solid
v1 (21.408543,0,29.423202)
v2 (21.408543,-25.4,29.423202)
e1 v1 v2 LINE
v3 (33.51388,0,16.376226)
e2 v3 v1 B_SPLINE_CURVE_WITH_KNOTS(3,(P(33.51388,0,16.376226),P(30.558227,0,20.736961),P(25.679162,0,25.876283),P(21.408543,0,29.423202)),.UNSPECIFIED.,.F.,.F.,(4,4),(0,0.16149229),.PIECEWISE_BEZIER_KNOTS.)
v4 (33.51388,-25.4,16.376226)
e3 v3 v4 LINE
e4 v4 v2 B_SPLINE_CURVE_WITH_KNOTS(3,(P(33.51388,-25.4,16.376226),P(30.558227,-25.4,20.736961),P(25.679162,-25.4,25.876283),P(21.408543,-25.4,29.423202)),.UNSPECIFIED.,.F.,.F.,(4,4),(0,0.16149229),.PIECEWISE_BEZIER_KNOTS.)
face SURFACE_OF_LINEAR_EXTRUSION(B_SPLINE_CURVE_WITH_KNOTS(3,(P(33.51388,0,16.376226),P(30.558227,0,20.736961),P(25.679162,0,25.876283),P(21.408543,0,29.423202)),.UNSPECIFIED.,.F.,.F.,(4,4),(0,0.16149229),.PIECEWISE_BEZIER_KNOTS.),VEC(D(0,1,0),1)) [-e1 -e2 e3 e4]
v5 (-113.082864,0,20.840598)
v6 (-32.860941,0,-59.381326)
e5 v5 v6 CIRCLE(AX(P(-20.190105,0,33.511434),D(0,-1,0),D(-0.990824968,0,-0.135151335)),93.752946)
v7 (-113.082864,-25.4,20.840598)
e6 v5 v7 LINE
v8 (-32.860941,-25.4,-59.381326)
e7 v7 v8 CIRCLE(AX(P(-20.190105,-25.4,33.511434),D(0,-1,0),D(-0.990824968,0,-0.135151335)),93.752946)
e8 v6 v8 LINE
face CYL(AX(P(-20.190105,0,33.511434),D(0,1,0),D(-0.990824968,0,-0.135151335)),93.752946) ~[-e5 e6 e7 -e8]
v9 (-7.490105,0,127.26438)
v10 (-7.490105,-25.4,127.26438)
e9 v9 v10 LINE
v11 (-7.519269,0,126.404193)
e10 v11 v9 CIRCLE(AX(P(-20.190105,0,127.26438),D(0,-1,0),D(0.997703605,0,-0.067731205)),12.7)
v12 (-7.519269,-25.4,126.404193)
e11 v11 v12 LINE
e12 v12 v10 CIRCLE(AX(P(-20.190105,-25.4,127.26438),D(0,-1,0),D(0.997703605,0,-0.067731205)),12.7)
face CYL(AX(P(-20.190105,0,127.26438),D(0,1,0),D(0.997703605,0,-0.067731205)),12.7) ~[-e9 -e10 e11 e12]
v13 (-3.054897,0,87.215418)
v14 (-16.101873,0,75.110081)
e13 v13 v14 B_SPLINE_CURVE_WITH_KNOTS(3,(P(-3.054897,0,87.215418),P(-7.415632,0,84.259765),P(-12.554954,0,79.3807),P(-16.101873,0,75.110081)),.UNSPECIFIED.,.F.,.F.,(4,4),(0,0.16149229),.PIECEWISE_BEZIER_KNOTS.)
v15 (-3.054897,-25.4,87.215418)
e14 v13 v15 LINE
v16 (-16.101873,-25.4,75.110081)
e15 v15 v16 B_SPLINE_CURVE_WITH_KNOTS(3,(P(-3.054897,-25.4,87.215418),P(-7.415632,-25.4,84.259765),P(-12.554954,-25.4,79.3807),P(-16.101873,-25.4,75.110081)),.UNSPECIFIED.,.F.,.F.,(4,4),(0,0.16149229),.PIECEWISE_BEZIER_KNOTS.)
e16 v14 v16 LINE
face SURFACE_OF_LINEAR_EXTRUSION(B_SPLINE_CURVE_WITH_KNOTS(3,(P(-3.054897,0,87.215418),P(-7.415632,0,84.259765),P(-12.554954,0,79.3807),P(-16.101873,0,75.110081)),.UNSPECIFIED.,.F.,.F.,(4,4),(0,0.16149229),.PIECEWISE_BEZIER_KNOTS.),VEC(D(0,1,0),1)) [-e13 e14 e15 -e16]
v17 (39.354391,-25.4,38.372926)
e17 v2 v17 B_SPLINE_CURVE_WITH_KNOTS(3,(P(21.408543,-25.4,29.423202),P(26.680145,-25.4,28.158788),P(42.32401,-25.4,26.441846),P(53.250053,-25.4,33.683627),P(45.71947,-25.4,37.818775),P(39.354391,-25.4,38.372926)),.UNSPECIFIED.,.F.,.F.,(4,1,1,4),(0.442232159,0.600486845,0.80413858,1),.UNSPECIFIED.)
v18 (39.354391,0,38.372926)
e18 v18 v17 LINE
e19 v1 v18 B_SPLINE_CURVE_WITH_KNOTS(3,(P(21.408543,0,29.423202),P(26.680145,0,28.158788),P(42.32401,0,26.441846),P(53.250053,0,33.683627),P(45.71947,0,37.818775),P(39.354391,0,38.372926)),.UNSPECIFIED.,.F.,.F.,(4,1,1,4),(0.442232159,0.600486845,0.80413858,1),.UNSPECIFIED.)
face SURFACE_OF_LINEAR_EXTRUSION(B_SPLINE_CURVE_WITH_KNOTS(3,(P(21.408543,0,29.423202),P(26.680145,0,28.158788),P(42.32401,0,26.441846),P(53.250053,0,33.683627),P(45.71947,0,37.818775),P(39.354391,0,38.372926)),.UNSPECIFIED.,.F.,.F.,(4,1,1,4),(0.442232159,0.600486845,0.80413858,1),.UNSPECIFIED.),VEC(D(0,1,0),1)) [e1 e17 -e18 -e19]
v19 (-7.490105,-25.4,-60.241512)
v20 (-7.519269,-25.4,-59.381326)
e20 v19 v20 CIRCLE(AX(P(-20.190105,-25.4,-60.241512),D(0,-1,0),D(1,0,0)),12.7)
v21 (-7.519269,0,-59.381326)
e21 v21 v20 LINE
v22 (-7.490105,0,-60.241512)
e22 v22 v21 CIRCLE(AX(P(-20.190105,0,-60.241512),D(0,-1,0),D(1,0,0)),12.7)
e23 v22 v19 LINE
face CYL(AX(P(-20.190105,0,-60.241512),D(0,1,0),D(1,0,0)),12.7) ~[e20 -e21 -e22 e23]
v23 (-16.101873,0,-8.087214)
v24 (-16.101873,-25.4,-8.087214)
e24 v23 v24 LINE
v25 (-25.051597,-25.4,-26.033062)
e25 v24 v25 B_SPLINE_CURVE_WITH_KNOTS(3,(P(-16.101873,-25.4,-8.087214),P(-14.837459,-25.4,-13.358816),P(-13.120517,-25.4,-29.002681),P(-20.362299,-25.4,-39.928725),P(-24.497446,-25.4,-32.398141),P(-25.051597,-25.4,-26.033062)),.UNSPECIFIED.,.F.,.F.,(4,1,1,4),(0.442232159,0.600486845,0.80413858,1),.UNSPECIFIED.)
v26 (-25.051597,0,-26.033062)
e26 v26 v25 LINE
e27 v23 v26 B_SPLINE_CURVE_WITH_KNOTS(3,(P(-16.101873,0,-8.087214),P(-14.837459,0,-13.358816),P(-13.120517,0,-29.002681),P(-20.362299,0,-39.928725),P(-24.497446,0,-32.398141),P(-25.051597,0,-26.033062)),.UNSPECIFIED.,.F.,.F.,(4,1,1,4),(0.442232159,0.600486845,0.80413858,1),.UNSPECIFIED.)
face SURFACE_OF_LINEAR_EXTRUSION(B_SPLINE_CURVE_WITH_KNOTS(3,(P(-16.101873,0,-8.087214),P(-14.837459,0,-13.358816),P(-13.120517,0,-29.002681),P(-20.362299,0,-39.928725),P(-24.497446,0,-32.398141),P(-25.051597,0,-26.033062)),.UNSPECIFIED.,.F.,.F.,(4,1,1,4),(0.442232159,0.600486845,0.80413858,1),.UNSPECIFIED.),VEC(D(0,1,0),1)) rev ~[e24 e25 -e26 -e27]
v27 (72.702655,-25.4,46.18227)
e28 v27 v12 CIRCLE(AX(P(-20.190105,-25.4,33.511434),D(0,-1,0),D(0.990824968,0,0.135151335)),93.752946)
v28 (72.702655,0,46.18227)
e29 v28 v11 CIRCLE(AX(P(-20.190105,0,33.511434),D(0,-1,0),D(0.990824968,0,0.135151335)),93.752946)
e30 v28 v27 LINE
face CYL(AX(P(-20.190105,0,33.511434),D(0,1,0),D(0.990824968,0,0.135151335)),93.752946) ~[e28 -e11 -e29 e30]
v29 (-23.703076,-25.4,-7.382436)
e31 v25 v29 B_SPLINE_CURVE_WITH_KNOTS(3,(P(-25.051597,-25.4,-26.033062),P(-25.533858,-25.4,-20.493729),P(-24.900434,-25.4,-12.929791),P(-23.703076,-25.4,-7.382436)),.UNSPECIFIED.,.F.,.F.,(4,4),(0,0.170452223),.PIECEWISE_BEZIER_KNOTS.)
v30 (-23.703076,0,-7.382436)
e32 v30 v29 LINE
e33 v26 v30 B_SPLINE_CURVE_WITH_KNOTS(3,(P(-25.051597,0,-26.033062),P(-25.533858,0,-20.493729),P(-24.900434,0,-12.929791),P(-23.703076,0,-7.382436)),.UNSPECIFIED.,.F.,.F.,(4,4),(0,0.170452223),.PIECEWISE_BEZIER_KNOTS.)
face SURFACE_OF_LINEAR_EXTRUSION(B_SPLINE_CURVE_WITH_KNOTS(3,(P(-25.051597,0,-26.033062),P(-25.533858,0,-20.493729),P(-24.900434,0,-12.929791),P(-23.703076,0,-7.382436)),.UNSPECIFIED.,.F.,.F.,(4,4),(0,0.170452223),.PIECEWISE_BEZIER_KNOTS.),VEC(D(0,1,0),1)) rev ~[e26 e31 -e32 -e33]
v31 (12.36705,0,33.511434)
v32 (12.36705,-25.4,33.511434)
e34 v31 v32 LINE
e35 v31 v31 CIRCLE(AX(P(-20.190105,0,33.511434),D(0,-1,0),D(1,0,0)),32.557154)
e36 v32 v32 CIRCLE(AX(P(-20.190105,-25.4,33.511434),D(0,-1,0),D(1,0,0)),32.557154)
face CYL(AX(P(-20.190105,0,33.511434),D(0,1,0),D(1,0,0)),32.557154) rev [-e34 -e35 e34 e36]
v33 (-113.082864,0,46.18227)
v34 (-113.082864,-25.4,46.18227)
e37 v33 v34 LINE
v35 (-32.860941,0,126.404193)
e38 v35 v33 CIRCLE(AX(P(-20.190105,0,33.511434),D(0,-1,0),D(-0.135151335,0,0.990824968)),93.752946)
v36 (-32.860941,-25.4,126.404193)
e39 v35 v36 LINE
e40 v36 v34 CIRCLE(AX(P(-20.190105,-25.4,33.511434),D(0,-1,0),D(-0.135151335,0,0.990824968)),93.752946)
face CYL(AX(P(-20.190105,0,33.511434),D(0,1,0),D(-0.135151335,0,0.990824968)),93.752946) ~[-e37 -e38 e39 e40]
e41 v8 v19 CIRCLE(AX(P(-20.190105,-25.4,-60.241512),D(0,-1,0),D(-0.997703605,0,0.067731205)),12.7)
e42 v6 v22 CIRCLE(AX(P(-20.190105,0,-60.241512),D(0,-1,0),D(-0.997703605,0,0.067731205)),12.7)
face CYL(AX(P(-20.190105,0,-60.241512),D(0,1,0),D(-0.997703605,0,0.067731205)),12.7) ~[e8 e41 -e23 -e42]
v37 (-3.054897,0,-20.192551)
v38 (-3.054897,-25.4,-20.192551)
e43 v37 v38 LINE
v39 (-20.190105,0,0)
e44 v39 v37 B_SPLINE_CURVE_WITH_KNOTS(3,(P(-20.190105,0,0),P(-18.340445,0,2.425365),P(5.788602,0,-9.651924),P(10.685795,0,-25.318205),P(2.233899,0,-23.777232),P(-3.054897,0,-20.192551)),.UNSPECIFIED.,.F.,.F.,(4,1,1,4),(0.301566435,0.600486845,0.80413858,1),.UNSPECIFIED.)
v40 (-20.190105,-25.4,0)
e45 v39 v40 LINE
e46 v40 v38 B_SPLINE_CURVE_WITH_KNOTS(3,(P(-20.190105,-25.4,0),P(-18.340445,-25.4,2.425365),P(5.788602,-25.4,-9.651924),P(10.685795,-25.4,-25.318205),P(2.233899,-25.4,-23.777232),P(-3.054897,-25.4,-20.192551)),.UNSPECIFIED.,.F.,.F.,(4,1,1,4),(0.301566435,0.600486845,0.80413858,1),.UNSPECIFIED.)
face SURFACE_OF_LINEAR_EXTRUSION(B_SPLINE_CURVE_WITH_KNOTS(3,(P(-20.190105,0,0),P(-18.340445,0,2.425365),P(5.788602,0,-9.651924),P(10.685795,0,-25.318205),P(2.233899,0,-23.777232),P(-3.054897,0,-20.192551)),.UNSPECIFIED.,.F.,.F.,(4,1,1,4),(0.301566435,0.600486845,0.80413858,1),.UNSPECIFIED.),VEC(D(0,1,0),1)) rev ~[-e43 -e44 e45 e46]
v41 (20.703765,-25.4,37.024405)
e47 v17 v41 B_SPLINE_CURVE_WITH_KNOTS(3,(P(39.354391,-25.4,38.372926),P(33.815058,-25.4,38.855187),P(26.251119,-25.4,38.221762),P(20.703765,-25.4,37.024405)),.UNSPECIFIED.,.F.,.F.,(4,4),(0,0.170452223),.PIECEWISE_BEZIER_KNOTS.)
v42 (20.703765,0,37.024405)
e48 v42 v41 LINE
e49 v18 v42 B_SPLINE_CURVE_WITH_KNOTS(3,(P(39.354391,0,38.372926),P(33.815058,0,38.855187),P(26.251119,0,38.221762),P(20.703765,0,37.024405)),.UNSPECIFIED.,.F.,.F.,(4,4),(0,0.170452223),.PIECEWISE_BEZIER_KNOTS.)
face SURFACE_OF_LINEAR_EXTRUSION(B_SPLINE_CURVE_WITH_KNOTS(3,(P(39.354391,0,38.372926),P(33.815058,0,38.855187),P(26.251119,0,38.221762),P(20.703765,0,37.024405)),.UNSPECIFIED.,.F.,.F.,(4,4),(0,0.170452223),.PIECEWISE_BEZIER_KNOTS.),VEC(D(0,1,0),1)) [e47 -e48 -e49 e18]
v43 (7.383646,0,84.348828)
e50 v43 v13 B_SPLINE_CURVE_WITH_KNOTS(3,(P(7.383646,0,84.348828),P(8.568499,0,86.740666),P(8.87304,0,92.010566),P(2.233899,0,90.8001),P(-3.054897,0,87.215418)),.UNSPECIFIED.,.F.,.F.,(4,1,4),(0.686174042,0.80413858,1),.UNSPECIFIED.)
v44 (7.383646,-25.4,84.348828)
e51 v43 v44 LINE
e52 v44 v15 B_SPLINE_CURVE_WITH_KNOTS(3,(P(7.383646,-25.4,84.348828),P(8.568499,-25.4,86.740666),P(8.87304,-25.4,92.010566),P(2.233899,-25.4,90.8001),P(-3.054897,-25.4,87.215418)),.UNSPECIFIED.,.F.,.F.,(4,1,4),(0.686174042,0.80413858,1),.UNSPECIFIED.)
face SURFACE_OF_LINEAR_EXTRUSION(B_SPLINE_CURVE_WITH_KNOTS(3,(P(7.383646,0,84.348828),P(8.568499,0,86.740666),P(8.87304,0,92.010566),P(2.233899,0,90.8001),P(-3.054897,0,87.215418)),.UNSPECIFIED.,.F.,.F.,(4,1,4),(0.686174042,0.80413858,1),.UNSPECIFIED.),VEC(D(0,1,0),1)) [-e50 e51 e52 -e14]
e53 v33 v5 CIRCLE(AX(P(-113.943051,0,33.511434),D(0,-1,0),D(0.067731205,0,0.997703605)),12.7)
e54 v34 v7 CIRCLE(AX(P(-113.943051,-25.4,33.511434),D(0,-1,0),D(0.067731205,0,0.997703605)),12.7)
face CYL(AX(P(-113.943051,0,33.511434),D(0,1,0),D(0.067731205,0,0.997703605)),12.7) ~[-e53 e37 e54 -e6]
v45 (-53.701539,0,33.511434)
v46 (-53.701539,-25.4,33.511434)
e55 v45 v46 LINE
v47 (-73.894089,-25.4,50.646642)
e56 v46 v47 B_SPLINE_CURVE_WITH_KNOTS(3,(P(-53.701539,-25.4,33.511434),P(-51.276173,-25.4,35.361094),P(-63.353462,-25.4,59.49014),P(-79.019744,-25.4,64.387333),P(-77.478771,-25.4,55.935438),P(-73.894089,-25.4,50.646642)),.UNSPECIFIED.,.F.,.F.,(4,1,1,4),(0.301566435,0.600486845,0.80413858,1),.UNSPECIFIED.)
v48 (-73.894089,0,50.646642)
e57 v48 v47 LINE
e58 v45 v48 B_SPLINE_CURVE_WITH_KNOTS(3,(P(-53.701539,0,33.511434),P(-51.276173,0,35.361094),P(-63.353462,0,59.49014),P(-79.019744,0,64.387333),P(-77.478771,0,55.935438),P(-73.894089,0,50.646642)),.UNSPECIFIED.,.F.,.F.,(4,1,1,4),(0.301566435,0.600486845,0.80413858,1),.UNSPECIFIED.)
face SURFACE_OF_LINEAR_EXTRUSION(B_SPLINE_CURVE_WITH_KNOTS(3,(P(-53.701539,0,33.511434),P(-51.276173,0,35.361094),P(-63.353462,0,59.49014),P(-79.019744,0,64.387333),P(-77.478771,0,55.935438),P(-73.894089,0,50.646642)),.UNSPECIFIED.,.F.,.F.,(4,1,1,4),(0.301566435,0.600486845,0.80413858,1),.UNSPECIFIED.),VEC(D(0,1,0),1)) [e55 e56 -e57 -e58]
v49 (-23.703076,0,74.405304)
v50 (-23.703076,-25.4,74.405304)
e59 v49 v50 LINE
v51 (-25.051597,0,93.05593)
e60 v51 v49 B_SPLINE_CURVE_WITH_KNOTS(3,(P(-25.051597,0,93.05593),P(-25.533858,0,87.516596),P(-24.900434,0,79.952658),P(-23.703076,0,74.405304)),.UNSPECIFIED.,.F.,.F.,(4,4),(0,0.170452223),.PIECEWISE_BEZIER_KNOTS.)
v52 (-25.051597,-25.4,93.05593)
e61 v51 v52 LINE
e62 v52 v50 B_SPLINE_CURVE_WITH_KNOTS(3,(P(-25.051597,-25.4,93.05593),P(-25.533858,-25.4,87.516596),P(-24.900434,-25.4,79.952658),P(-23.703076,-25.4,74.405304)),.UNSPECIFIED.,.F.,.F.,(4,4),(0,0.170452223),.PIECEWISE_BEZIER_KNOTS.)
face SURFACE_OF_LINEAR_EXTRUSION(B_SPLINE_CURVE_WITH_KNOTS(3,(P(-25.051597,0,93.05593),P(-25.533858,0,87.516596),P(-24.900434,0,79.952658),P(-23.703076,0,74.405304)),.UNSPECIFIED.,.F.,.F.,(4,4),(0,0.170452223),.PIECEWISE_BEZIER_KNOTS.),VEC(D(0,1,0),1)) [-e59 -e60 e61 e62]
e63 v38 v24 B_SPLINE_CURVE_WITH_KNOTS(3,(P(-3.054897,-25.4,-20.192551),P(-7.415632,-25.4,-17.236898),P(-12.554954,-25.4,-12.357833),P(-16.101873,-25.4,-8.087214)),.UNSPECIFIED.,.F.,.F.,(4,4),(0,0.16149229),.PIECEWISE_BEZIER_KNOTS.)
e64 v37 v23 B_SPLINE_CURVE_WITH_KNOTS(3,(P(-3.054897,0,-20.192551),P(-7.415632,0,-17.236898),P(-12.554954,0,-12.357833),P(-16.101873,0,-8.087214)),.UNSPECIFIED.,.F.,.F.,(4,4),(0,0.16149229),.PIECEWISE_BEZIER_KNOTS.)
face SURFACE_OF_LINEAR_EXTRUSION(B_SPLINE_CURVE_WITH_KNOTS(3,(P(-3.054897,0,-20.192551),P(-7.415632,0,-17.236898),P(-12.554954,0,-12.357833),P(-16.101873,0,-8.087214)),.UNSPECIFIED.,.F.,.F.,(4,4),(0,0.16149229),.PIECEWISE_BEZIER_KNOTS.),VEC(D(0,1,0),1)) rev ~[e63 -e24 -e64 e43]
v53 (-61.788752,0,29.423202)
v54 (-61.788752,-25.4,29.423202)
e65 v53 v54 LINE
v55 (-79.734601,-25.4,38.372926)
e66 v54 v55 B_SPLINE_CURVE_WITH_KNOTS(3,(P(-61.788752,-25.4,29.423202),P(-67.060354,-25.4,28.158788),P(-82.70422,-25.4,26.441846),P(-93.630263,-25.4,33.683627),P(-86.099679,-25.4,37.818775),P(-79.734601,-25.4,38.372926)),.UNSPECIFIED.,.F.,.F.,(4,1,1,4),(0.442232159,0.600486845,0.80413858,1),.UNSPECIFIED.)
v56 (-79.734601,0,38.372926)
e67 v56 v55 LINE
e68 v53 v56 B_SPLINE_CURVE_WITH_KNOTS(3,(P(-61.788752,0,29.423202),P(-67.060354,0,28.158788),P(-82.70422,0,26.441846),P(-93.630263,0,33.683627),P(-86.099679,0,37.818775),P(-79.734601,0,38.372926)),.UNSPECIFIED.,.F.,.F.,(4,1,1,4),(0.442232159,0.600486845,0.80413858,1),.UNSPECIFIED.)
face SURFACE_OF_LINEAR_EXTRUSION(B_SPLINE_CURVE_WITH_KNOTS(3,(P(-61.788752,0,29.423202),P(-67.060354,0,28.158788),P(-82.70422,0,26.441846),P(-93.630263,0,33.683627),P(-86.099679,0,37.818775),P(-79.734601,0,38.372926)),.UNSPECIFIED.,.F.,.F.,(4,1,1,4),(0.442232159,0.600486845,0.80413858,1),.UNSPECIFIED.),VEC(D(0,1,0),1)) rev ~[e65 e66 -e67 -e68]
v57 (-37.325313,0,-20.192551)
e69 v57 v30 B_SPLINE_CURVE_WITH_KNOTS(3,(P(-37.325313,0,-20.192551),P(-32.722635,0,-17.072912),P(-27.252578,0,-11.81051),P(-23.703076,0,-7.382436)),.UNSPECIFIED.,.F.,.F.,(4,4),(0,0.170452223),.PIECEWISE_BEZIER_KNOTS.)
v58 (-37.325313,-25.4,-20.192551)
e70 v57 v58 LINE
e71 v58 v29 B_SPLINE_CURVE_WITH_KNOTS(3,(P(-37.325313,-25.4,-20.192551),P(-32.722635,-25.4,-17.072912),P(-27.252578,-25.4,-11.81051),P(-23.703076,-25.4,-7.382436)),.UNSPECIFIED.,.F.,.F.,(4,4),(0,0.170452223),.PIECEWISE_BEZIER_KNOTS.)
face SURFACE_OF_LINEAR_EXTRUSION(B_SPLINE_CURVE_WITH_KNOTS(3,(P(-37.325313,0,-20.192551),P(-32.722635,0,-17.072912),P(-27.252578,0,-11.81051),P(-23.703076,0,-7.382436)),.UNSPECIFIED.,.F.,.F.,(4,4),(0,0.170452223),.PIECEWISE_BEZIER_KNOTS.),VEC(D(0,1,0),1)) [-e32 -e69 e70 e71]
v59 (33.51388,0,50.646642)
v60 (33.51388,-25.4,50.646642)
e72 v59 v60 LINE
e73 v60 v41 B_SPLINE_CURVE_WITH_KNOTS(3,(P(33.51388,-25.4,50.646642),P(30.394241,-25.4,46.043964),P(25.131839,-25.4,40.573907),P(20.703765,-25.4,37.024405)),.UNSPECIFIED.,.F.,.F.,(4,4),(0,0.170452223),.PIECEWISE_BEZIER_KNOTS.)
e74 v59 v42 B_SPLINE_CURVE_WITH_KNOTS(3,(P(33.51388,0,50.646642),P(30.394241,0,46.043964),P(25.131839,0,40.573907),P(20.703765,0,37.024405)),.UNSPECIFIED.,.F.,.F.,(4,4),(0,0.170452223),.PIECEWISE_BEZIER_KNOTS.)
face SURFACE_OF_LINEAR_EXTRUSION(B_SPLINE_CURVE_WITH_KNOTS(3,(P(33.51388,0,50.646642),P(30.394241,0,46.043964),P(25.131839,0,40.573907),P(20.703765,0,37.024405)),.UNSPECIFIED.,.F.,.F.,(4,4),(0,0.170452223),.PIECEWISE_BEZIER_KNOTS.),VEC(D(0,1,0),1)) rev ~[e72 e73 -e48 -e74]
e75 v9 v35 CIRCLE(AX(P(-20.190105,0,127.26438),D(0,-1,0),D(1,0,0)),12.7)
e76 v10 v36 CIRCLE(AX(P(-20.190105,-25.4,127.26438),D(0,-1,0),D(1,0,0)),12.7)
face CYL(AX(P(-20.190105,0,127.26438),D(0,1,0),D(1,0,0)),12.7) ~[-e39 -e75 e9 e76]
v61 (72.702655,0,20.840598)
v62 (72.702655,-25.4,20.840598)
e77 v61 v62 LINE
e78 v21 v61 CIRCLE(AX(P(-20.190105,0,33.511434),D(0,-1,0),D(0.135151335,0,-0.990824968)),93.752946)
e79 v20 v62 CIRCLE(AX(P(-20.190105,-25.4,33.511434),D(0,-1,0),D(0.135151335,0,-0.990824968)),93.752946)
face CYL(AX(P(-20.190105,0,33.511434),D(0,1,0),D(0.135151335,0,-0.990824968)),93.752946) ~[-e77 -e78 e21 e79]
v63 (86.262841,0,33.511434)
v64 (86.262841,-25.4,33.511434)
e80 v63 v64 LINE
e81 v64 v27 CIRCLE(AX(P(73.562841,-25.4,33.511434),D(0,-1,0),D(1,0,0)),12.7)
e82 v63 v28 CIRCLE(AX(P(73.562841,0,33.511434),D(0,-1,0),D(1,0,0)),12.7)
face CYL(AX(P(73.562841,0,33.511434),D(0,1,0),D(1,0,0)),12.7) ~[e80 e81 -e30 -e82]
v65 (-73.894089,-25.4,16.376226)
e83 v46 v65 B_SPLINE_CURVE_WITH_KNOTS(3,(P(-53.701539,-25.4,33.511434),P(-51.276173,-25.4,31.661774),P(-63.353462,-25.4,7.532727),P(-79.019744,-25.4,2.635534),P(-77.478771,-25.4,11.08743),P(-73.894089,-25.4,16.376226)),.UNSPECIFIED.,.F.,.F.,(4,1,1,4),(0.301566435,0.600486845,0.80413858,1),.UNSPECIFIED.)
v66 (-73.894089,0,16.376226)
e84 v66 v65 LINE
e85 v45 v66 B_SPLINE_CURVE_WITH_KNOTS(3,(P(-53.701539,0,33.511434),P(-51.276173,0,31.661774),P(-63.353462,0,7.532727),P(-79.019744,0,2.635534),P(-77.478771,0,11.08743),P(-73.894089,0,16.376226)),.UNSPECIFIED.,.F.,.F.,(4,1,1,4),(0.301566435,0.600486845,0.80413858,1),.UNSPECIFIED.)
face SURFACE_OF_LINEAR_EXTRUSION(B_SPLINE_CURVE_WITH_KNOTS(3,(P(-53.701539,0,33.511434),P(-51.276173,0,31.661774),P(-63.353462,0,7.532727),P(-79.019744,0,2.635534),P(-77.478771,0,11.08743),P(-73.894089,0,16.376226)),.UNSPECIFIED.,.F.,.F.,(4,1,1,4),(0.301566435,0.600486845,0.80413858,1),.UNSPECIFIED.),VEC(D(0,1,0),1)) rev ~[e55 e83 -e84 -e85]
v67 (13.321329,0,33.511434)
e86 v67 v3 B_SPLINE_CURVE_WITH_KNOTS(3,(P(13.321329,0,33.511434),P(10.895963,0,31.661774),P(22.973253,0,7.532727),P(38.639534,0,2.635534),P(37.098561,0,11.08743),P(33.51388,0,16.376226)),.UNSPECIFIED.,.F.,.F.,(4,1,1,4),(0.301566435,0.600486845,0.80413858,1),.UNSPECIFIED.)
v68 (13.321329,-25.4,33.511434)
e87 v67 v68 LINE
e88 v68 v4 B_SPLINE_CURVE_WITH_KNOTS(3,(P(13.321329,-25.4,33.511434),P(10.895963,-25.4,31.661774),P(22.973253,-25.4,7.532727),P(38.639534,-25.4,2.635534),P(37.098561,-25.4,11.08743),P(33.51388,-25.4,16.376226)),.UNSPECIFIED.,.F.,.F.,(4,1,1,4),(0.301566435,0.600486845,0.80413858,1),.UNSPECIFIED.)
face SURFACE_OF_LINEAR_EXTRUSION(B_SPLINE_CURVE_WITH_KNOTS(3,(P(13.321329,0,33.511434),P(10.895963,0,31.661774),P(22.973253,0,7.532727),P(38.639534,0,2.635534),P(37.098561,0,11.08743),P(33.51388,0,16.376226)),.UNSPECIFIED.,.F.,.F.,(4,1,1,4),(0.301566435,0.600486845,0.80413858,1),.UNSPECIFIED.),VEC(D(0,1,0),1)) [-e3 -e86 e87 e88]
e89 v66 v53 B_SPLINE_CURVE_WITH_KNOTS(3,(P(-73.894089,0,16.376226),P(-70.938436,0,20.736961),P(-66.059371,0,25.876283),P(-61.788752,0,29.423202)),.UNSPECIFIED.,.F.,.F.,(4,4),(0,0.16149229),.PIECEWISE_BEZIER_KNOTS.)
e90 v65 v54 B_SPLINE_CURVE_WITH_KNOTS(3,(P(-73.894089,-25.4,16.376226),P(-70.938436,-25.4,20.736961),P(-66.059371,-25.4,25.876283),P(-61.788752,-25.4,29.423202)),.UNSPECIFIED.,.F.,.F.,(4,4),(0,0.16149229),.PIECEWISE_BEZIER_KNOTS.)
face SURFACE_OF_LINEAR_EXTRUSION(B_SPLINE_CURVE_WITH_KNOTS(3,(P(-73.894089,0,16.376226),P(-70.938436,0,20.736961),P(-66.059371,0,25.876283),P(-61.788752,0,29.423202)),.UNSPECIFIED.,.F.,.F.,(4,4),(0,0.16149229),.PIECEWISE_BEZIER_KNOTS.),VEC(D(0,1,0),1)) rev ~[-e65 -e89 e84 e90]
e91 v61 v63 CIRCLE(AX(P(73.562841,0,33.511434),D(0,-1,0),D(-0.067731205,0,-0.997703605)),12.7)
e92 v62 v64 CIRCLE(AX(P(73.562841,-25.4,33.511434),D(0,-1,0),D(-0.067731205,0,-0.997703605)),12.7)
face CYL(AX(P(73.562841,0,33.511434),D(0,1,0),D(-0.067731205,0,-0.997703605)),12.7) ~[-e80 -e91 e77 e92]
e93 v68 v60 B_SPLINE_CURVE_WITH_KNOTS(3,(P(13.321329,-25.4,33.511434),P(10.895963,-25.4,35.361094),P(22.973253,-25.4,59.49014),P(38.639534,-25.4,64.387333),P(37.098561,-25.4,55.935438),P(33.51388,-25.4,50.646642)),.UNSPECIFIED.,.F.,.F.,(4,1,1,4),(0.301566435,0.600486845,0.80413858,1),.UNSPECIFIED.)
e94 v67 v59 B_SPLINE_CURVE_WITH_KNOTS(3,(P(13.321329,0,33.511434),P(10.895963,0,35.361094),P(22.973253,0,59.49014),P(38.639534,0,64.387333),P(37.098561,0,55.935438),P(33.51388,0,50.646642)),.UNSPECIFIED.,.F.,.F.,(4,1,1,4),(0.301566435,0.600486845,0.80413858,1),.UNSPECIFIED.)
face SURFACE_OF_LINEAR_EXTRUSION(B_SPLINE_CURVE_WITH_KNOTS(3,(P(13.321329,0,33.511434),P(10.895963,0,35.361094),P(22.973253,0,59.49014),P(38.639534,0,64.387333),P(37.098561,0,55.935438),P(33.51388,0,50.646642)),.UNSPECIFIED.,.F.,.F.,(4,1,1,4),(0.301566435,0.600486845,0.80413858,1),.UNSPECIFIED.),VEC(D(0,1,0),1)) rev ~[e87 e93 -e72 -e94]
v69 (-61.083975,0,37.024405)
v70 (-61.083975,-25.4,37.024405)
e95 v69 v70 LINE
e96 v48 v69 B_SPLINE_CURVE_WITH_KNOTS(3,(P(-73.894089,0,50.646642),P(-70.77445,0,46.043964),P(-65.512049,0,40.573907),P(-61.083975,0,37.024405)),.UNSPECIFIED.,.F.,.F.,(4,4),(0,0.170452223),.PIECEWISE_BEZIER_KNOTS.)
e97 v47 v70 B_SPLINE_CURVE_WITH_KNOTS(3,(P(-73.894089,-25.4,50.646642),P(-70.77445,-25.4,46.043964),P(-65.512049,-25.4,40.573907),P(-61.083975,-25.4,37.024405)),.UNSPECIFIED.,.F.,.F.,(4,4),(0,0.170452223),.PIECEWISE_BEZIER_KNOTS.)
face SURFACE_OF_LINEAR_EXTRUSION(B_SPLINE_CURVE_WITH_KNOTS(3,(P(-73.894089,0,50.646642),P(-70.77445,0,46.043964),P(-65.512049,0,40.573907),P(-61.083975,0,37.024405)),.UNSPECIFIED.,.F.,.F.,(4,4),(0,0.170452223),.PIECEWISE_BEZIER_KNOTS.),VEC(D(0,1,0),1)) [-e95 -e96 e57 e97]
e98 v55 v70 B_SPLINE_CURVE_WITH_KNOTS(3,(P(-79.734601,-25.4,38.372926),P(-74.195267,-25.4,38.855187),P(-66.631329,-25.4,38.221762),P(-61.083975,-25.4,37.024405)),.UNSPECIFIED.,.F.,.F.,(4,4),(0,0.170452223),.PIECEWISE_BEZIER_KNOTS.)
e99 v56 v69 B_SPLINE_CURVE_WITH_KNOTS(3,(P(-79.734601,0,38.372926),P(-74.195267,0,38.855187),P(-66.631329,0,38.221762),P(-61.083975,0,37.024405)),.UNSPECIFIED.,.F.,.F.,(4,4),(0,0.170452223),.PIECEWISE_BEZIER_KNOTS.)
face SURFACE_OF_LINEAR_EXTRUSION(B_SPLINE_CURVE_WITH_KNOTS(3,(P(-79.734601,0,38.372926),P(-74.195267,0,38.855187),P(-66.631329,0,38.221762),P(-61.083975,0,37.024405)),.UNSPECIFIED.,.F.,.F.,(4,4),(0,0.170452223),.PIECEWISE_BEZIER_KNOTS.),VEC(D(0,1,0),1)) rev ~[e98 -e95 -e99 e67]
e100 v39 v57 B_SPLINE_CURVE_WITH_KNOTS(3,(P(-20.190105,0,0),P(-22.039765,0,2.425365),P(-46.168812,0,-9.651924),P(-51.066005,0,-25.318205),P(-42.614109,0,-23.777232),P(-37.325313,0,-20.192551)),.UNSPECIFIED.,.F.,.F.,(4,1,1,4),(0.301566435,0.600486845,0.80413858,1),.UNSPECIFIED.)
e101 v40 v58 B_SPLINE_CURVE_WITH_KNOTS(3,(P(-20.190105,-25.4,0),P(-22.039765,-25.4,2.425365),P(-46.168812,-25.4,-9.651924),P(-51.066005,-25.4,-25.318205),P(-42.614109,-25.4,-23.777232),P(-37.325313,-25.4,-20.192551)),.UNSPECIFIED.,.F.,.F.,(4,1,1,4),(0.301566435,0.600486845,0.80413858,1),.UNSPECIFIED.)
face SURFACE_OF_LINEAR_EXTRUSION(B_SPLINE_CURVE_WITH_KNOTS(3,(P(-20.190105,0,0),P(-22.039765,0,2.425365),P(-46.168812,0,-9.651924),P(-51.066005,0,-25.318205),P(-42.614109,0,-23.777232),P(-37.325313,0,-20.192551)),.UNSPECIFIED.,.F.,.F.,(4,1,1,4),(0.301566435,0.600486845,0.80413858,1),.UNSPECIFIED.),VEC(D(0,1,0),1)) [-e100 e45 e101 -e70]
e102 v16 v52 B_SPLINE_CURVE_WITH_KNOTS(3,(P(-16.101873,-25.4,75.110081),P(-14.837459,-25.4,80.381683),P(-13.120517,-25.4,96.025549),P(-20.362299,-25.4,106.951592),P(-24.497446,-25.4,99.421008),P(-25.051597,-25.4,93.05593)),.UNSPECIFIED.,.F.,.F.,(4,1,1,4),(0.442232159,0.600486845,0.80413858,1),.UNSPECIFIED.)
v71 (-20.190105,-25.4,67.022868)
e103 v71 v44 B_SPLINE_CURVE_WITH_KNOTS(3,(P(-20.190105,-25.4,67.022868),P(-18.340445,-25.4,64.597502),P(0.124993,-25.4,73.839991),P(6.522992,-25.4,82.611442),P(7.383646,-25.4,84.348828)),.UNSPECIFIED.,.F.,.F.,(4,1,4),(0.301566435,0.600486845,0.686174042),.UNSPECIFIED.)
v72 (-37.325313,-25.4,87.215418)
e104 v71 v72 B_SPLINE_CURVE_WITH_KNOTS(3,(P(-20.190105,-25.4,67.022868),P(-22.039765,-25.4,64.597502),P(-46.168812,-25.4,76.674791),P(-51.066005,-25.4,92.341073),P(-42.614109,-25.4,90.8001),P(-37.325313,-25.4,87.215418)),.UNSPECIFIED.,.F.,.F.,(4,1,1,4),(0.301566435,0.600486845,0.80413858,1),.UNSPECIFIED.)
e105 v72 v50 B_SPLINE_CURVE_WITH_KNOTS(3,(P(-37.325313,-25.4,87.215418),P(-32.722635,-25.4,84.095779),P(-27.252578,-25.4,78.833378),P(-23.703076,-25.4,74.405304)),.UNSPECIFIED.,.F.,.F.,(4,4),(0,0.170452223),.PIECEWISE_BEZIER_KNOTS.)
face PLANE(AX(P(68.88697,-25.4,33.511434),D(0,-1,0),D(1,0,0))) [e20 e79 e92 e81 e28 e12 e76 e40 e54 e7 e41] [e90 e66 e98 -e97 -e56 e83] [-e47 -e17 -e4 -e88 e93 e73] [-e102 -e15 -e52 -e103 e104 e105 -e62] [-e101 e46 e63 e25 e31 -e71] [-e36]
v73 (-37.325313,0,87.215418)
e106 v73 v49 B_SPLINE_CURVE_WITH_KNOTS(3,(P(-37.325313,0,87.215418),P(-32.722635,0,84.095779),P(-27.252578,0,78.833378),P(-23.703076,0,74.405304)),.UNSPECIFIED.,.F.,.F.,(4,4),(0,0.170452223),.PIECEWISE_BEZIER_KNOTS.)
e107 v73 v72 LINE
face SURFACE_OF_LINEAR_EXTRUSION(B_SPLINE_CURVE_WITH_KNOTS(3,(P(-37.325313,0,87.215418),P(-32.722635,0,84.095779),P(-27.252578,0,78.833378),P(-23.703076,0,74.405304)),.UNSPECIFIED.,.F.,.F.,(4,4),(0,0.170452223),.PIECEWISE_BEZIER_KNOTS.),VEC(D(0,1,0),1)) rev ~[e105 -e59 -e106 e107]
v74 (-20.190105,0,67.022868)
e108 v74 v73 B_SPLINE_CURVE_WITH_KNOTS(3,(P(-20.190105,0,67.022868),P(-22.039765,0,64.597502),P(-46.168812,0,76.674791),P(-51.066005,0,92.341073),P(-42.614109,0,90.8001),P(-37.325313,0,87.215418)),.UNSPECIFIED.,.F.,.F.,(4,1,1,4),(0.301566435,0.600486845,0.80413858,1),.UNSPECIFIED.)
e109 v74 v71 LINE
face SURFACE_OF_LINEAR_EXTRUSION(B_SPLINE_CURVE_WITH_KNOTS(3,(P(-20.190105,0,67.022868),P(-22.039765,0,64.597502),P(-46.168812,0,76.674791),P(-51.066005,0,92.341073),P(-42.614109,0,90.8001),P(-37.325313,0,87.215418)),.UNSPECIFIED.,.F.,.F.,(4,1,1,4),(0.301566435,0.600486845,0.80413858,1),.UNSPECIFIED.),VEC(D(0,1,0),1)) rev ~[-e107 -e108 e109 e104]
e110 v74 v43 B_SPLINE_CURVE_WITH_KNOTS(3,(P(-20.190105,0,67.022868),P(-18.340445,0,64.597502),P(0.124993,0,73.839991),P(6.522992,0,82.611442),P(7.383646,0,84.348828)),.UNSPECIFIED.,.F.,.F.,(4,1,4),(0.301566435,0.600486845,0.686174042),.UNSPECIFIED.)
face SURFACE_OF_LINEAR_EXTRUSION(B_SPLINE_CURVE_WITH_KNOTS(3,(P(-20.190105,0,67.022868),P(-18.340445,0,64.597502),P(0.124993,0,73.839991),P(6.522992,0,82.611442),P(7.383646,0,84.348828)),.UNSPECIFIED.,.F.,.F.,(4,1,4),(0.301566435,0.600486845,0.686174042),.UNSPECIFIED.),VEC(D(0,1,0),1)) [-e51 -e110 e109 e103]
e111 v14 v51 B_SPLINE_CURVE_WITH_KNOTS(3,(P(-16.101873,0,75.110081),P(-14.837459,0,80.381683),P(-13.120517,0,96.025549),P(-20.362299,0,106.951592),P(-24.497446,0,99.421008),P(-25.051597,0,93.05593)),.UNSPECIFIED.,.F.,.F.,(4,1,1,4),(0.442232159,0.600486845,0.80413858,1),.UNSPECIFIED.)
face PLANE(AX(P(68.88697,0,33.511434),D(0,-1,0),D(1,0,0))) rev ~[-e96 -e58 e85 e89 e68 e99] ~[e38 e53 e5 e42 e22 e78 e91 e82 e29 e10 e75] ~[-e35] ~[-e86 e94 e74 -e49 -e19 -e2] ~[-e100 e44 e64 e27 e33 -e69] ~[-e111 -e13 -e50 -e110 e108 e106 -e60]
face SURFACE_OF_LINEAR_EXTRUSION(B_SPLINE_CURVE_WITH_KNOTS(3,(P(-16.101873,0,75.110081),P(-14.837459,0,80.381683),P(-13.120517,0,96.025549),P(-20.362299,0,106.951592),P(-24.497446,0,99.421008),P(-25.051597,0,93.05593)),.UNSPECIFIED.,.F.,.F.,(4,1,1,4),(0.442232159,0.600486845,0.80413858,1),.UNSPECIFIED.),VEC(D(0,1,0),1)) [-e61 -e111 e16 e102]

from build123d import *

# Parameters (mm, degrees)
F0_R     = 32.5571544533
F1_DEPTH = 25.4


with BuildPart() as f1:
    # F0 (on Front) → F1 (new body)
    with BuildSketch(Plane.XZ):
        with BuildLine():
            ThreePointArc((72.7026547079, 20.8405979641), (73.3475472363, 27.1614337504), (73.5628410121, 33.5114337504))
            ThreePointArc((73.5628410121, 33.5114337504), (73.3475472363, 39.8614337504), (72.7026547079, 46.1822695366))
            ThreePointArc((72.7026547079, 46.1822695366), (60.8628410121, 33.5114337504), (72.7026547079, 20.8405979641))
        make_face()
        with BuildLine():
            ThreePointArc((72.7026547079, 46.1822695366), (73.3475472363, 39.8614337504), (73.5628410121, 33.5114337504))
            ThreePointArc((73.5628410121, 33.5114337504), (73.3475472363, 27.1614337504), (72.7026547079, 20.8405979641))
            ThreePointArc((72.7026547079, 20.8405979641), (82.2336435682, 24.2320381326), (86.2628410121, 33.5114337504))
            ThreePointArc((86.2628410121, 33.5114337504), (82.2336435682, 42.7908293682), (72.7026547079, 46.1822695366))
        make_face()
        with BuildLine():
            ThreePointArc((72.7026547079, 20.8405979641), (60.8628410121, 33.5114337504), (72.7026547079, 46.1822695366))
            ThreePointArc((72.7026547079, 46.1822695366), (46.1032389276, 99.8047775201), (-7.5192690559, 126.4041933005))
            ThreePointArc((-7.5192690559, 126.4041933005), (-20.1901048422, 114.5643796046), (-32.8609406284, 126.4041933005))
            ThreePointArc((-32.8609406284, 126.4041933005), (-86.4834486119, 99.8047775201), (-113.0828643922, 46.1822695366))
            ThreePointArc((-113.0828643922, 46.1822695366), (-104.6636550786, 42.1822363066), (-101.2430506964, 33.5114337504))
            ThreePointArc((-101.2430506964, 33.5114337504), (-104.6636550786, 24.8406311942), (-113.0828643922, 20.8405979641))
            ThreePointArc((-113.0828643922, 20.8405979641), (-86.4834486119, -32.7819100194), (-32.8609406284, -59.3813257997))
            ThreePointArc((-32.8609406284, -59.3813257997), (-20.1901048422, -47.5415121038), (-7.5192690559, -59.3813257997))
            ThreePointArc((-7.5192690559, -59.3813257997), (46.1032389276, -32.7819100194), (72.7026547079, 20.8405979641))
        make_face()
        with BuildLine():
            add(Edge.make_bspline(
                [(-16.1018727124, -8.0872138884), (-14.8374587809, -13.3588156034), (-13.1205174889, -29.0026812346), (-20.3622985733, -39.9287245765), (-24.4974463507, -32.3981407691), (-25.0515972706, -26.0330624878)],
                knots=[0.4422321589, 0.4422321589, 0.4422321589, 0.4422321589, 0.6004868453, 0.8041385802, 1, 1, 1, 1], degree=3))
            add(Edge.make_bspline(
                [(-25.0515972706, -26.0330624878), (-25.5338579224, -20.4937289052), (-24.9004335132, -12.9297905574), (-23.7030758657, -7.3824363603)],
                knots=[0, 0, 0, 0, 0.1704522226, 0.1704522226, 0.1704522226, 0.1704522226], degree=3))
            add(Edge.make_bspline(
                [(-37.3253126603, -20.1925507096), (-32.7226346039, -17.0729118546), (-27.2525779633, -11.8105102964), (-23.7030758657, -7.3824363603)],
                knots=[0, 0, 0, 0, 0.1704522226, 0.1704522226, 0.1704522226, 0.1704522226], degree=3))
            add(Edge.make_bspline(
                [(-20.1901048422, 0), (-22.0397646286, 2.4253654914), (-46.1688115148, -9.6519237601), (-51.0660045272, -25.3182052214), (-42.6141088114, -23.777232012), (-37.3253126603, -20.1925507096)],
                knots=[0.3015664348, 0.3015664348, 0.3015664348, 0.3015664348, 0.6004868453, 0.8041385802, 1, 1, 1, 1], degree=3))
            add(Edge.make_bspline(
                [(-20.1901048422, 0), (-18.3404450558, 2.4253654914), (5.7886018304, -9.6519237601), (10.6857948428, -25.3182052214), (2.2338991271, -23.777232012), (-3.0548970241, -20.1925507096)],
                knots=[0.3015664348, 0.3015664348, 0.3015664348, 0.3015664348, 0.6004868453, 0.8041385802, 1, 1, 1, 1], degree=3))
            add(Edge.make_bspline(
                [(-3.0548970241, -20.1925507096), (-7.415632291, -17.2368977161), (-12.5549541899, -12.3578327013), (-16.1018727124, -8.0872138884)],
                knots=[0, 0, 0, 0, 0.1614922898, 0.1614922898, 0.1614922898, 0.1614922898], degree=3))
        make_face(mode=Mode.SUBTRACT)
        with BuildLine():
            add(Edge.make_bspline(
                [(-61.788752481, 29.4232016206), (-67.060354196, 28.1587876891), (-82.7042198271, 26.4418463971), (-93.6302631691, 33.6836274815), (-86.0996793616, 37.8187752589), (-79.7346010804, 38.3729261789)],
                knots=[0.4422321589, 0.4422321589, 0.4422321589, 0.4422321589, 0.6004868453, 0.8041385802, 1, 1, 1, 1], degree=3))
            add(Edge.make_bspline(
                [(-79.7346010804, 38.3729261789), (-74.1952674978, 38.8551868307), (-66.63132915, 38.2217624214), (-61.0839749529, 37.0244047739)],
                knots=[0, 0, 0, 0, 0.1704522226, 0.1704522226, 0.1704522226, 0.1704522226], degree=3))
            add(Edge.make_bspline(
                [(-73.8940893022, 50.6466415685), (-70.7744504472, 46.0439635121), (-65.512048889, 40.5739068715), (-61.0839749529, 37.0244047739)],
                knots=[0, 0, 0, 0, 0.1704522226, 0.1704522226, 0.1704522226, 0.1704522226], degree=3))
            add(Edge.make_bspline(
                [(-53.7015385926, 33.5114337504), (-51.2761731011, 35.3610935368), (-63.3534623526, 59.490140423), (-79.0197438139, 64.3873334354), (-77.4787706045, 55.9354377196), (-73.8940893022, 50.6466415685)],
                knots=[0.3015664348, 0.3015664348, 0.3015664348, 0.3015664348, 0.6004868453, 0.8041385802, 1, 1, 1, 1], degree=3))
            add(Edge.make_bspline(
                [(-53.7015385926, 33.5114337504), (-51.2761731011, 31.661773964), (-63.3534623526, 7.5327270778), (-79.0197438139, 2.6355340654), (-77.4787706045, 11.0874297811), (-73.8940893022, 16.3762259323)],
                knots=[0.3015664348, 0.3015664348, 0.3015664348, 0.3015664348, 0.6004868453, 0.8041385802, 1, 1, 1, 1], degree=3))
            add(Edge.make_bspline(
                [(-73.8940893022, 16.3762259323), (-70.9384363087, 20.7369611992), (-66.0593712938, 25.8762830981), (-61.788752481, 29.4232016206)],
                knots=[0, 0, 0, 0, 0.1614922898, 0.1614922898, 0.1614922898, 0.1614922898], degree=3))
        make_face(mode=Mode.SUBTRACT)
        with Locations((-20.1901048422, 33.5114337504)):
            Circle(F0_R, mode=Mode.SUBTRACT)
        with BuildLine():
            add(Edge.make_bspline(
                [(39.354391396, 38.3729261789), (33.8150578134, 38.8551868307), (26.2511194656, 38.2217624214), (20.7037652685, 37.0244047739)],
                knots=[0, 0, 0, 0, 0.1704522226, 0.1704522226, 0.1704522226, 0.1704522226], degree=3))
            add(Edge.make_bspline(
                [(21.4085427966, 29.4232016206), (26.6801445116, 28.1587876891), (42.3240101428, 26.4418463971), (53.2500534847, 33.6836274815), (45.7194696773, 37.8187752589), (39.354391396, 38.3729261789)],
                knots=[0.4422321589, 0.4422321589, 0.4422321589, 0.4422321589, 0.6004868453, 0.8041385802, 1, 1, 1, 1], degree=3))
            add(Edge.make_bspline(
                [(33.5138796178, 16.3762259323), (30.5582266244, 20.7369611992), (25.6791616095, 25.8762830981), (21.4085427966, 29.4232016206)],
                knots=[0, 0, 0, 0, 0.1614922898, 0.1614922898, 0.1614922898, 0.1614922898], degree=3))
            add(Edge.make_bspline(
                [(13.3213289082, 33.5114337504), (10.8959634168, 31.661773964), (22.9732526683, 7.5327270778), (38.6395341296, 2.6355340654), (37.0985609202, 11.0874297811), (33.5138796178, 16.3762259323)],
                knots=[0.3015664348, 0.3015664348, 0.3015664348, 0.3015664348, 0.6004868453, 0.8041385802, 1, 1, 1, 1], degree=3))
            add(Edge.make_bspline(
                [(13.3213289082, 33.5114337504), (10.8959634168, 35.3610935368), (22.9732526683, 59.490140423), (38.6395341296, 64.3873334354), (37.0985609202, 55.9354377196), (33.5138796178, 50.6466415685)],
                knots=[0.3015664348, 0.3015664348, 0.3015664348, 0.3015664348, 0.6004868453, 0.8041385802, 1, 1, 1, 1], degree=3))
            add(Edge.make_bspline(
                [(33.5138796178, 50.6466415685), (30.3942407628, 46.0439635122), (25.1318392046, 40.5739068715), (20.7037652685, 37.0244047739)],
                knots=[0, 0, 0, 0, 0.1704522226, 0.1704522226, 0.1704522226, 0.1704522226], degree=3))
        make_face(mode=Mode.SUBTRACT)
        with BuildLine():
            add(Edge.make_bspline(
                [(-25.0515972706, 93.0559299886), (-25.5338579224, 87.516596406), (-24.9004335132, 79.9526580582), (-23.7030758657, 74.4053038611)],
                knots=[0, 0, 0, 0, 0.1704522226, 0.1704522226, 0.1704522226, 0.1704522226], degree=3))
            add(Edge.make_bspline(
                [(-16.1018727124, 75.1100813892), (-14.8374587809, 80.3816831042), (-13.1205174889, 96.0255487353), (-20.3622985733, 106.9515920773), (-24.4974463507, 99.4210082698), (-25.0515972706, 93.0559299886)],
                knots=[0.4422321589, 0.4422321589, 0.4422321589, 0.4422321589, 0.6004868453, 0.8041385802, 1, 1, 1, 1], degree=3))
            add(Edge.make_bspline(
                [(-3.0548970241, 87.2154182104), (-7.415632291, 84.2597652169), (-12.5549541899, 79.380700202), (-16.1018727124, 75.1100813892)],
                knots=[0, 0, 0, 0, 0.1614922898, 0.1614922898, 0.1614922898, 0.1614922898], degree=3))
            add(Edge.make_bspline(
                [(7.3836464649, 84.3488277478), (8.5684994899, 86.7406655992), (8.8730403963, 92.0105662735), (2.2338991271, 90.8000995127), (-3.0548970241, 87.2154182104)],
                knots=[0.6861740416, 0.6861740416, 0.6861740416, 0.6861740416, 0.8041385802, 1, 1, 1, 1], degree=3))
            add(Edge.make_bspline(
                [(7.3836464648, 84.348827748), (10.0527060203, 84.3785949738), (14.9328812478, 82.3665094814), (10.9617364962, 76.9100054786), (5.437364977, 73.7002353798)],
                knots=[0.6861740416, 0.6861740416, 0.6861740416, 0.6861740416, 0.8041385802, 1, 1, 1, 1], degree=3))
            add(Edge.make_bspline(
                [(5.437364977, 73.7002353798), (-3.0684705553, 68.7581751904), (-18.7951923439, 64.2800044612), (-20.1901048422, 67.0228675008)],
                knots=[0, 0, 0, 0, 0.3015664348, 0.3015664348, 0.3015664348, 0.3015664348], degree=3))
            add(Edge.make_bspline(
                [(-20.1901048422, 67.0228675008), (-22.0397646286, 64.5975020093), (-46.1688115148, 76.6747912609), (-51.0660045272, 92.3410727222), (-42.6141088114, 90.8000995127), (-37.3253126603, 87.2154182104)],
                knots=[0.3015664348, 0.3015664348, 0.3015664348, 0.3015664348, 0.6004868453, 0.8041385802, 1, 1, 1, 1], degree=3))
            add(Edge.make_bspline(
                [(-37.3253126603, 87.2154182104), (-32.7226346039, 84.0957793554), (-27.2525779633, 78.8333777972), (-23.7030758657, 74.4053038611)],
                knots=[0, 0, 0, 0, 0.1704522226, 0.1704522226, 0.1704522226, 0.1704522226], degree=3))
        make_face(mode=Mode.SUBTRACT)
        with BuildLine():
            ThreePointArc((-32.8609406284, 126.4041933005), (-20.1901048422, 114.5643796046), (-7.5192690559, 126.4041933005))
            ThreePointArc((-7.5192690559, 126.4041933005), (-20.1901048422, 127.2643796046), (-32.8609406284, 126.4041933005))
        make_face()
        with BuildLine():
            ThreePointArc((-32.8609406284, 126.4041933005), (-20.1901048422, 127.2643796046), (-7.5192690559, 126.4041933005))
            ThreePointArc((-7.5192690559, 126.4041933005), (-7.4973979897, 126.8340393238), (-7.4901048422, 127.2643796046))
            ThreePointArc((-7.4901048422, 127.2643796046), (-20.620445123, 139.9570864571), (-32.8609406284, 126.4041933005))
        make_face()
        with BuildLine():
            ThreePointArc((-7.4901048422, -60.2415121038), (-7.4973979897, -59.811171823), (-7.5192690559, -59.3813257997))
            ThreePointArc((-7.5192690559, -59.3813257997), (-20.1901048422, -60.2415121038), (-32.8609406284, -59.3813257997))
            ThreePointArc((-32.8609406284, -59.3813257997), (-20.620445123, -72.9342189563), (-7.4901048422, -60.2415121038))
        make_face()
        with BuildLine():
            ThreePointArc((-32.8609406284, -59.3813257997), (-20.1901048422, -60.2415121038), (-7.5192690559, -59.3813257997))
            ThreePointArc((-7.5192690559, -59.3813257997), (-20.1901048422, -47.5415121038), (-32.8609406284, -59.3813257997))
        make_face()
        with BuildLine():
            ThreePointArc((-101.2430506964, 33.5114337504), (-104.6636550786, 42.1822363066), (-113.0828643922, 46.1822695366))
            ThreePointArc((-113.0828643922, 46.1822695366), (-113.9430506964, 33.5114337504), (-113.0828643922, 20.8405979641))
            ThreePointArc((-113.0828643922, 20.8405979641), (-104.6636550786, 24.8406311942), (-101.2430506964, 33.5114337504))
        make_face()
        with BuildLine():
            ThreePointArc((-113.0828643922, 20.8405979641), (-113.9430506964, 33.5114337504), (-113.0828643922, 46.1822695366))
            ThreePointArc((-113.0828643922, 46.1822695366), (-126.6430506964, 33.5114337504), (-113.0828643922, 20.8405979641))
        make_face()
        with BuildLine():
            add(Edge.make_bspline(
                [(-20.1901048422, 67.0228675008), (-18.3404450558, 64.5975020093), (0.1249933138, 73.8399905916), (6.5229917716, 82.6114422419), (7.3836464649, 84.3488277478)],
                knots=[0.3015664348, 0.3015664348, 0.3015664348, 0.3015664348, 0.6004868453, 0.6861740416, 0.6861740416, 0.6861740416, 0.6861740416], degree=3))
            add(Edge.make_bspline(
                [(5.437364977, 73.7002353798), (-3.0684705553, 68.7581751904), (-18.7951923439, 64.2800044612), (-20.1901048422, 67.0228675008)],
                knots=[0, 0, 0, 0, 0.3015664348, 0.3015664348, 0.3015664348, 0.3015664348], degree=3))
            add(Edge.make_bspline(
                [(7.3836464648, 84.348827748), (10.0527060203, 84.3785949738), (14.9328812478, 82.3665094814), (10.9617364962, 76.9100054786), (5.437364977, 73.7002353798)],
                knots=[0.6861740416, 0.6861740416, 0.6861740416, 0.6861740416, 0.8041385802, 1, 1, 1, 1], degree=3))
        make_face()
    extrude(amount=F1_DEPTH)


solid = f1.part
